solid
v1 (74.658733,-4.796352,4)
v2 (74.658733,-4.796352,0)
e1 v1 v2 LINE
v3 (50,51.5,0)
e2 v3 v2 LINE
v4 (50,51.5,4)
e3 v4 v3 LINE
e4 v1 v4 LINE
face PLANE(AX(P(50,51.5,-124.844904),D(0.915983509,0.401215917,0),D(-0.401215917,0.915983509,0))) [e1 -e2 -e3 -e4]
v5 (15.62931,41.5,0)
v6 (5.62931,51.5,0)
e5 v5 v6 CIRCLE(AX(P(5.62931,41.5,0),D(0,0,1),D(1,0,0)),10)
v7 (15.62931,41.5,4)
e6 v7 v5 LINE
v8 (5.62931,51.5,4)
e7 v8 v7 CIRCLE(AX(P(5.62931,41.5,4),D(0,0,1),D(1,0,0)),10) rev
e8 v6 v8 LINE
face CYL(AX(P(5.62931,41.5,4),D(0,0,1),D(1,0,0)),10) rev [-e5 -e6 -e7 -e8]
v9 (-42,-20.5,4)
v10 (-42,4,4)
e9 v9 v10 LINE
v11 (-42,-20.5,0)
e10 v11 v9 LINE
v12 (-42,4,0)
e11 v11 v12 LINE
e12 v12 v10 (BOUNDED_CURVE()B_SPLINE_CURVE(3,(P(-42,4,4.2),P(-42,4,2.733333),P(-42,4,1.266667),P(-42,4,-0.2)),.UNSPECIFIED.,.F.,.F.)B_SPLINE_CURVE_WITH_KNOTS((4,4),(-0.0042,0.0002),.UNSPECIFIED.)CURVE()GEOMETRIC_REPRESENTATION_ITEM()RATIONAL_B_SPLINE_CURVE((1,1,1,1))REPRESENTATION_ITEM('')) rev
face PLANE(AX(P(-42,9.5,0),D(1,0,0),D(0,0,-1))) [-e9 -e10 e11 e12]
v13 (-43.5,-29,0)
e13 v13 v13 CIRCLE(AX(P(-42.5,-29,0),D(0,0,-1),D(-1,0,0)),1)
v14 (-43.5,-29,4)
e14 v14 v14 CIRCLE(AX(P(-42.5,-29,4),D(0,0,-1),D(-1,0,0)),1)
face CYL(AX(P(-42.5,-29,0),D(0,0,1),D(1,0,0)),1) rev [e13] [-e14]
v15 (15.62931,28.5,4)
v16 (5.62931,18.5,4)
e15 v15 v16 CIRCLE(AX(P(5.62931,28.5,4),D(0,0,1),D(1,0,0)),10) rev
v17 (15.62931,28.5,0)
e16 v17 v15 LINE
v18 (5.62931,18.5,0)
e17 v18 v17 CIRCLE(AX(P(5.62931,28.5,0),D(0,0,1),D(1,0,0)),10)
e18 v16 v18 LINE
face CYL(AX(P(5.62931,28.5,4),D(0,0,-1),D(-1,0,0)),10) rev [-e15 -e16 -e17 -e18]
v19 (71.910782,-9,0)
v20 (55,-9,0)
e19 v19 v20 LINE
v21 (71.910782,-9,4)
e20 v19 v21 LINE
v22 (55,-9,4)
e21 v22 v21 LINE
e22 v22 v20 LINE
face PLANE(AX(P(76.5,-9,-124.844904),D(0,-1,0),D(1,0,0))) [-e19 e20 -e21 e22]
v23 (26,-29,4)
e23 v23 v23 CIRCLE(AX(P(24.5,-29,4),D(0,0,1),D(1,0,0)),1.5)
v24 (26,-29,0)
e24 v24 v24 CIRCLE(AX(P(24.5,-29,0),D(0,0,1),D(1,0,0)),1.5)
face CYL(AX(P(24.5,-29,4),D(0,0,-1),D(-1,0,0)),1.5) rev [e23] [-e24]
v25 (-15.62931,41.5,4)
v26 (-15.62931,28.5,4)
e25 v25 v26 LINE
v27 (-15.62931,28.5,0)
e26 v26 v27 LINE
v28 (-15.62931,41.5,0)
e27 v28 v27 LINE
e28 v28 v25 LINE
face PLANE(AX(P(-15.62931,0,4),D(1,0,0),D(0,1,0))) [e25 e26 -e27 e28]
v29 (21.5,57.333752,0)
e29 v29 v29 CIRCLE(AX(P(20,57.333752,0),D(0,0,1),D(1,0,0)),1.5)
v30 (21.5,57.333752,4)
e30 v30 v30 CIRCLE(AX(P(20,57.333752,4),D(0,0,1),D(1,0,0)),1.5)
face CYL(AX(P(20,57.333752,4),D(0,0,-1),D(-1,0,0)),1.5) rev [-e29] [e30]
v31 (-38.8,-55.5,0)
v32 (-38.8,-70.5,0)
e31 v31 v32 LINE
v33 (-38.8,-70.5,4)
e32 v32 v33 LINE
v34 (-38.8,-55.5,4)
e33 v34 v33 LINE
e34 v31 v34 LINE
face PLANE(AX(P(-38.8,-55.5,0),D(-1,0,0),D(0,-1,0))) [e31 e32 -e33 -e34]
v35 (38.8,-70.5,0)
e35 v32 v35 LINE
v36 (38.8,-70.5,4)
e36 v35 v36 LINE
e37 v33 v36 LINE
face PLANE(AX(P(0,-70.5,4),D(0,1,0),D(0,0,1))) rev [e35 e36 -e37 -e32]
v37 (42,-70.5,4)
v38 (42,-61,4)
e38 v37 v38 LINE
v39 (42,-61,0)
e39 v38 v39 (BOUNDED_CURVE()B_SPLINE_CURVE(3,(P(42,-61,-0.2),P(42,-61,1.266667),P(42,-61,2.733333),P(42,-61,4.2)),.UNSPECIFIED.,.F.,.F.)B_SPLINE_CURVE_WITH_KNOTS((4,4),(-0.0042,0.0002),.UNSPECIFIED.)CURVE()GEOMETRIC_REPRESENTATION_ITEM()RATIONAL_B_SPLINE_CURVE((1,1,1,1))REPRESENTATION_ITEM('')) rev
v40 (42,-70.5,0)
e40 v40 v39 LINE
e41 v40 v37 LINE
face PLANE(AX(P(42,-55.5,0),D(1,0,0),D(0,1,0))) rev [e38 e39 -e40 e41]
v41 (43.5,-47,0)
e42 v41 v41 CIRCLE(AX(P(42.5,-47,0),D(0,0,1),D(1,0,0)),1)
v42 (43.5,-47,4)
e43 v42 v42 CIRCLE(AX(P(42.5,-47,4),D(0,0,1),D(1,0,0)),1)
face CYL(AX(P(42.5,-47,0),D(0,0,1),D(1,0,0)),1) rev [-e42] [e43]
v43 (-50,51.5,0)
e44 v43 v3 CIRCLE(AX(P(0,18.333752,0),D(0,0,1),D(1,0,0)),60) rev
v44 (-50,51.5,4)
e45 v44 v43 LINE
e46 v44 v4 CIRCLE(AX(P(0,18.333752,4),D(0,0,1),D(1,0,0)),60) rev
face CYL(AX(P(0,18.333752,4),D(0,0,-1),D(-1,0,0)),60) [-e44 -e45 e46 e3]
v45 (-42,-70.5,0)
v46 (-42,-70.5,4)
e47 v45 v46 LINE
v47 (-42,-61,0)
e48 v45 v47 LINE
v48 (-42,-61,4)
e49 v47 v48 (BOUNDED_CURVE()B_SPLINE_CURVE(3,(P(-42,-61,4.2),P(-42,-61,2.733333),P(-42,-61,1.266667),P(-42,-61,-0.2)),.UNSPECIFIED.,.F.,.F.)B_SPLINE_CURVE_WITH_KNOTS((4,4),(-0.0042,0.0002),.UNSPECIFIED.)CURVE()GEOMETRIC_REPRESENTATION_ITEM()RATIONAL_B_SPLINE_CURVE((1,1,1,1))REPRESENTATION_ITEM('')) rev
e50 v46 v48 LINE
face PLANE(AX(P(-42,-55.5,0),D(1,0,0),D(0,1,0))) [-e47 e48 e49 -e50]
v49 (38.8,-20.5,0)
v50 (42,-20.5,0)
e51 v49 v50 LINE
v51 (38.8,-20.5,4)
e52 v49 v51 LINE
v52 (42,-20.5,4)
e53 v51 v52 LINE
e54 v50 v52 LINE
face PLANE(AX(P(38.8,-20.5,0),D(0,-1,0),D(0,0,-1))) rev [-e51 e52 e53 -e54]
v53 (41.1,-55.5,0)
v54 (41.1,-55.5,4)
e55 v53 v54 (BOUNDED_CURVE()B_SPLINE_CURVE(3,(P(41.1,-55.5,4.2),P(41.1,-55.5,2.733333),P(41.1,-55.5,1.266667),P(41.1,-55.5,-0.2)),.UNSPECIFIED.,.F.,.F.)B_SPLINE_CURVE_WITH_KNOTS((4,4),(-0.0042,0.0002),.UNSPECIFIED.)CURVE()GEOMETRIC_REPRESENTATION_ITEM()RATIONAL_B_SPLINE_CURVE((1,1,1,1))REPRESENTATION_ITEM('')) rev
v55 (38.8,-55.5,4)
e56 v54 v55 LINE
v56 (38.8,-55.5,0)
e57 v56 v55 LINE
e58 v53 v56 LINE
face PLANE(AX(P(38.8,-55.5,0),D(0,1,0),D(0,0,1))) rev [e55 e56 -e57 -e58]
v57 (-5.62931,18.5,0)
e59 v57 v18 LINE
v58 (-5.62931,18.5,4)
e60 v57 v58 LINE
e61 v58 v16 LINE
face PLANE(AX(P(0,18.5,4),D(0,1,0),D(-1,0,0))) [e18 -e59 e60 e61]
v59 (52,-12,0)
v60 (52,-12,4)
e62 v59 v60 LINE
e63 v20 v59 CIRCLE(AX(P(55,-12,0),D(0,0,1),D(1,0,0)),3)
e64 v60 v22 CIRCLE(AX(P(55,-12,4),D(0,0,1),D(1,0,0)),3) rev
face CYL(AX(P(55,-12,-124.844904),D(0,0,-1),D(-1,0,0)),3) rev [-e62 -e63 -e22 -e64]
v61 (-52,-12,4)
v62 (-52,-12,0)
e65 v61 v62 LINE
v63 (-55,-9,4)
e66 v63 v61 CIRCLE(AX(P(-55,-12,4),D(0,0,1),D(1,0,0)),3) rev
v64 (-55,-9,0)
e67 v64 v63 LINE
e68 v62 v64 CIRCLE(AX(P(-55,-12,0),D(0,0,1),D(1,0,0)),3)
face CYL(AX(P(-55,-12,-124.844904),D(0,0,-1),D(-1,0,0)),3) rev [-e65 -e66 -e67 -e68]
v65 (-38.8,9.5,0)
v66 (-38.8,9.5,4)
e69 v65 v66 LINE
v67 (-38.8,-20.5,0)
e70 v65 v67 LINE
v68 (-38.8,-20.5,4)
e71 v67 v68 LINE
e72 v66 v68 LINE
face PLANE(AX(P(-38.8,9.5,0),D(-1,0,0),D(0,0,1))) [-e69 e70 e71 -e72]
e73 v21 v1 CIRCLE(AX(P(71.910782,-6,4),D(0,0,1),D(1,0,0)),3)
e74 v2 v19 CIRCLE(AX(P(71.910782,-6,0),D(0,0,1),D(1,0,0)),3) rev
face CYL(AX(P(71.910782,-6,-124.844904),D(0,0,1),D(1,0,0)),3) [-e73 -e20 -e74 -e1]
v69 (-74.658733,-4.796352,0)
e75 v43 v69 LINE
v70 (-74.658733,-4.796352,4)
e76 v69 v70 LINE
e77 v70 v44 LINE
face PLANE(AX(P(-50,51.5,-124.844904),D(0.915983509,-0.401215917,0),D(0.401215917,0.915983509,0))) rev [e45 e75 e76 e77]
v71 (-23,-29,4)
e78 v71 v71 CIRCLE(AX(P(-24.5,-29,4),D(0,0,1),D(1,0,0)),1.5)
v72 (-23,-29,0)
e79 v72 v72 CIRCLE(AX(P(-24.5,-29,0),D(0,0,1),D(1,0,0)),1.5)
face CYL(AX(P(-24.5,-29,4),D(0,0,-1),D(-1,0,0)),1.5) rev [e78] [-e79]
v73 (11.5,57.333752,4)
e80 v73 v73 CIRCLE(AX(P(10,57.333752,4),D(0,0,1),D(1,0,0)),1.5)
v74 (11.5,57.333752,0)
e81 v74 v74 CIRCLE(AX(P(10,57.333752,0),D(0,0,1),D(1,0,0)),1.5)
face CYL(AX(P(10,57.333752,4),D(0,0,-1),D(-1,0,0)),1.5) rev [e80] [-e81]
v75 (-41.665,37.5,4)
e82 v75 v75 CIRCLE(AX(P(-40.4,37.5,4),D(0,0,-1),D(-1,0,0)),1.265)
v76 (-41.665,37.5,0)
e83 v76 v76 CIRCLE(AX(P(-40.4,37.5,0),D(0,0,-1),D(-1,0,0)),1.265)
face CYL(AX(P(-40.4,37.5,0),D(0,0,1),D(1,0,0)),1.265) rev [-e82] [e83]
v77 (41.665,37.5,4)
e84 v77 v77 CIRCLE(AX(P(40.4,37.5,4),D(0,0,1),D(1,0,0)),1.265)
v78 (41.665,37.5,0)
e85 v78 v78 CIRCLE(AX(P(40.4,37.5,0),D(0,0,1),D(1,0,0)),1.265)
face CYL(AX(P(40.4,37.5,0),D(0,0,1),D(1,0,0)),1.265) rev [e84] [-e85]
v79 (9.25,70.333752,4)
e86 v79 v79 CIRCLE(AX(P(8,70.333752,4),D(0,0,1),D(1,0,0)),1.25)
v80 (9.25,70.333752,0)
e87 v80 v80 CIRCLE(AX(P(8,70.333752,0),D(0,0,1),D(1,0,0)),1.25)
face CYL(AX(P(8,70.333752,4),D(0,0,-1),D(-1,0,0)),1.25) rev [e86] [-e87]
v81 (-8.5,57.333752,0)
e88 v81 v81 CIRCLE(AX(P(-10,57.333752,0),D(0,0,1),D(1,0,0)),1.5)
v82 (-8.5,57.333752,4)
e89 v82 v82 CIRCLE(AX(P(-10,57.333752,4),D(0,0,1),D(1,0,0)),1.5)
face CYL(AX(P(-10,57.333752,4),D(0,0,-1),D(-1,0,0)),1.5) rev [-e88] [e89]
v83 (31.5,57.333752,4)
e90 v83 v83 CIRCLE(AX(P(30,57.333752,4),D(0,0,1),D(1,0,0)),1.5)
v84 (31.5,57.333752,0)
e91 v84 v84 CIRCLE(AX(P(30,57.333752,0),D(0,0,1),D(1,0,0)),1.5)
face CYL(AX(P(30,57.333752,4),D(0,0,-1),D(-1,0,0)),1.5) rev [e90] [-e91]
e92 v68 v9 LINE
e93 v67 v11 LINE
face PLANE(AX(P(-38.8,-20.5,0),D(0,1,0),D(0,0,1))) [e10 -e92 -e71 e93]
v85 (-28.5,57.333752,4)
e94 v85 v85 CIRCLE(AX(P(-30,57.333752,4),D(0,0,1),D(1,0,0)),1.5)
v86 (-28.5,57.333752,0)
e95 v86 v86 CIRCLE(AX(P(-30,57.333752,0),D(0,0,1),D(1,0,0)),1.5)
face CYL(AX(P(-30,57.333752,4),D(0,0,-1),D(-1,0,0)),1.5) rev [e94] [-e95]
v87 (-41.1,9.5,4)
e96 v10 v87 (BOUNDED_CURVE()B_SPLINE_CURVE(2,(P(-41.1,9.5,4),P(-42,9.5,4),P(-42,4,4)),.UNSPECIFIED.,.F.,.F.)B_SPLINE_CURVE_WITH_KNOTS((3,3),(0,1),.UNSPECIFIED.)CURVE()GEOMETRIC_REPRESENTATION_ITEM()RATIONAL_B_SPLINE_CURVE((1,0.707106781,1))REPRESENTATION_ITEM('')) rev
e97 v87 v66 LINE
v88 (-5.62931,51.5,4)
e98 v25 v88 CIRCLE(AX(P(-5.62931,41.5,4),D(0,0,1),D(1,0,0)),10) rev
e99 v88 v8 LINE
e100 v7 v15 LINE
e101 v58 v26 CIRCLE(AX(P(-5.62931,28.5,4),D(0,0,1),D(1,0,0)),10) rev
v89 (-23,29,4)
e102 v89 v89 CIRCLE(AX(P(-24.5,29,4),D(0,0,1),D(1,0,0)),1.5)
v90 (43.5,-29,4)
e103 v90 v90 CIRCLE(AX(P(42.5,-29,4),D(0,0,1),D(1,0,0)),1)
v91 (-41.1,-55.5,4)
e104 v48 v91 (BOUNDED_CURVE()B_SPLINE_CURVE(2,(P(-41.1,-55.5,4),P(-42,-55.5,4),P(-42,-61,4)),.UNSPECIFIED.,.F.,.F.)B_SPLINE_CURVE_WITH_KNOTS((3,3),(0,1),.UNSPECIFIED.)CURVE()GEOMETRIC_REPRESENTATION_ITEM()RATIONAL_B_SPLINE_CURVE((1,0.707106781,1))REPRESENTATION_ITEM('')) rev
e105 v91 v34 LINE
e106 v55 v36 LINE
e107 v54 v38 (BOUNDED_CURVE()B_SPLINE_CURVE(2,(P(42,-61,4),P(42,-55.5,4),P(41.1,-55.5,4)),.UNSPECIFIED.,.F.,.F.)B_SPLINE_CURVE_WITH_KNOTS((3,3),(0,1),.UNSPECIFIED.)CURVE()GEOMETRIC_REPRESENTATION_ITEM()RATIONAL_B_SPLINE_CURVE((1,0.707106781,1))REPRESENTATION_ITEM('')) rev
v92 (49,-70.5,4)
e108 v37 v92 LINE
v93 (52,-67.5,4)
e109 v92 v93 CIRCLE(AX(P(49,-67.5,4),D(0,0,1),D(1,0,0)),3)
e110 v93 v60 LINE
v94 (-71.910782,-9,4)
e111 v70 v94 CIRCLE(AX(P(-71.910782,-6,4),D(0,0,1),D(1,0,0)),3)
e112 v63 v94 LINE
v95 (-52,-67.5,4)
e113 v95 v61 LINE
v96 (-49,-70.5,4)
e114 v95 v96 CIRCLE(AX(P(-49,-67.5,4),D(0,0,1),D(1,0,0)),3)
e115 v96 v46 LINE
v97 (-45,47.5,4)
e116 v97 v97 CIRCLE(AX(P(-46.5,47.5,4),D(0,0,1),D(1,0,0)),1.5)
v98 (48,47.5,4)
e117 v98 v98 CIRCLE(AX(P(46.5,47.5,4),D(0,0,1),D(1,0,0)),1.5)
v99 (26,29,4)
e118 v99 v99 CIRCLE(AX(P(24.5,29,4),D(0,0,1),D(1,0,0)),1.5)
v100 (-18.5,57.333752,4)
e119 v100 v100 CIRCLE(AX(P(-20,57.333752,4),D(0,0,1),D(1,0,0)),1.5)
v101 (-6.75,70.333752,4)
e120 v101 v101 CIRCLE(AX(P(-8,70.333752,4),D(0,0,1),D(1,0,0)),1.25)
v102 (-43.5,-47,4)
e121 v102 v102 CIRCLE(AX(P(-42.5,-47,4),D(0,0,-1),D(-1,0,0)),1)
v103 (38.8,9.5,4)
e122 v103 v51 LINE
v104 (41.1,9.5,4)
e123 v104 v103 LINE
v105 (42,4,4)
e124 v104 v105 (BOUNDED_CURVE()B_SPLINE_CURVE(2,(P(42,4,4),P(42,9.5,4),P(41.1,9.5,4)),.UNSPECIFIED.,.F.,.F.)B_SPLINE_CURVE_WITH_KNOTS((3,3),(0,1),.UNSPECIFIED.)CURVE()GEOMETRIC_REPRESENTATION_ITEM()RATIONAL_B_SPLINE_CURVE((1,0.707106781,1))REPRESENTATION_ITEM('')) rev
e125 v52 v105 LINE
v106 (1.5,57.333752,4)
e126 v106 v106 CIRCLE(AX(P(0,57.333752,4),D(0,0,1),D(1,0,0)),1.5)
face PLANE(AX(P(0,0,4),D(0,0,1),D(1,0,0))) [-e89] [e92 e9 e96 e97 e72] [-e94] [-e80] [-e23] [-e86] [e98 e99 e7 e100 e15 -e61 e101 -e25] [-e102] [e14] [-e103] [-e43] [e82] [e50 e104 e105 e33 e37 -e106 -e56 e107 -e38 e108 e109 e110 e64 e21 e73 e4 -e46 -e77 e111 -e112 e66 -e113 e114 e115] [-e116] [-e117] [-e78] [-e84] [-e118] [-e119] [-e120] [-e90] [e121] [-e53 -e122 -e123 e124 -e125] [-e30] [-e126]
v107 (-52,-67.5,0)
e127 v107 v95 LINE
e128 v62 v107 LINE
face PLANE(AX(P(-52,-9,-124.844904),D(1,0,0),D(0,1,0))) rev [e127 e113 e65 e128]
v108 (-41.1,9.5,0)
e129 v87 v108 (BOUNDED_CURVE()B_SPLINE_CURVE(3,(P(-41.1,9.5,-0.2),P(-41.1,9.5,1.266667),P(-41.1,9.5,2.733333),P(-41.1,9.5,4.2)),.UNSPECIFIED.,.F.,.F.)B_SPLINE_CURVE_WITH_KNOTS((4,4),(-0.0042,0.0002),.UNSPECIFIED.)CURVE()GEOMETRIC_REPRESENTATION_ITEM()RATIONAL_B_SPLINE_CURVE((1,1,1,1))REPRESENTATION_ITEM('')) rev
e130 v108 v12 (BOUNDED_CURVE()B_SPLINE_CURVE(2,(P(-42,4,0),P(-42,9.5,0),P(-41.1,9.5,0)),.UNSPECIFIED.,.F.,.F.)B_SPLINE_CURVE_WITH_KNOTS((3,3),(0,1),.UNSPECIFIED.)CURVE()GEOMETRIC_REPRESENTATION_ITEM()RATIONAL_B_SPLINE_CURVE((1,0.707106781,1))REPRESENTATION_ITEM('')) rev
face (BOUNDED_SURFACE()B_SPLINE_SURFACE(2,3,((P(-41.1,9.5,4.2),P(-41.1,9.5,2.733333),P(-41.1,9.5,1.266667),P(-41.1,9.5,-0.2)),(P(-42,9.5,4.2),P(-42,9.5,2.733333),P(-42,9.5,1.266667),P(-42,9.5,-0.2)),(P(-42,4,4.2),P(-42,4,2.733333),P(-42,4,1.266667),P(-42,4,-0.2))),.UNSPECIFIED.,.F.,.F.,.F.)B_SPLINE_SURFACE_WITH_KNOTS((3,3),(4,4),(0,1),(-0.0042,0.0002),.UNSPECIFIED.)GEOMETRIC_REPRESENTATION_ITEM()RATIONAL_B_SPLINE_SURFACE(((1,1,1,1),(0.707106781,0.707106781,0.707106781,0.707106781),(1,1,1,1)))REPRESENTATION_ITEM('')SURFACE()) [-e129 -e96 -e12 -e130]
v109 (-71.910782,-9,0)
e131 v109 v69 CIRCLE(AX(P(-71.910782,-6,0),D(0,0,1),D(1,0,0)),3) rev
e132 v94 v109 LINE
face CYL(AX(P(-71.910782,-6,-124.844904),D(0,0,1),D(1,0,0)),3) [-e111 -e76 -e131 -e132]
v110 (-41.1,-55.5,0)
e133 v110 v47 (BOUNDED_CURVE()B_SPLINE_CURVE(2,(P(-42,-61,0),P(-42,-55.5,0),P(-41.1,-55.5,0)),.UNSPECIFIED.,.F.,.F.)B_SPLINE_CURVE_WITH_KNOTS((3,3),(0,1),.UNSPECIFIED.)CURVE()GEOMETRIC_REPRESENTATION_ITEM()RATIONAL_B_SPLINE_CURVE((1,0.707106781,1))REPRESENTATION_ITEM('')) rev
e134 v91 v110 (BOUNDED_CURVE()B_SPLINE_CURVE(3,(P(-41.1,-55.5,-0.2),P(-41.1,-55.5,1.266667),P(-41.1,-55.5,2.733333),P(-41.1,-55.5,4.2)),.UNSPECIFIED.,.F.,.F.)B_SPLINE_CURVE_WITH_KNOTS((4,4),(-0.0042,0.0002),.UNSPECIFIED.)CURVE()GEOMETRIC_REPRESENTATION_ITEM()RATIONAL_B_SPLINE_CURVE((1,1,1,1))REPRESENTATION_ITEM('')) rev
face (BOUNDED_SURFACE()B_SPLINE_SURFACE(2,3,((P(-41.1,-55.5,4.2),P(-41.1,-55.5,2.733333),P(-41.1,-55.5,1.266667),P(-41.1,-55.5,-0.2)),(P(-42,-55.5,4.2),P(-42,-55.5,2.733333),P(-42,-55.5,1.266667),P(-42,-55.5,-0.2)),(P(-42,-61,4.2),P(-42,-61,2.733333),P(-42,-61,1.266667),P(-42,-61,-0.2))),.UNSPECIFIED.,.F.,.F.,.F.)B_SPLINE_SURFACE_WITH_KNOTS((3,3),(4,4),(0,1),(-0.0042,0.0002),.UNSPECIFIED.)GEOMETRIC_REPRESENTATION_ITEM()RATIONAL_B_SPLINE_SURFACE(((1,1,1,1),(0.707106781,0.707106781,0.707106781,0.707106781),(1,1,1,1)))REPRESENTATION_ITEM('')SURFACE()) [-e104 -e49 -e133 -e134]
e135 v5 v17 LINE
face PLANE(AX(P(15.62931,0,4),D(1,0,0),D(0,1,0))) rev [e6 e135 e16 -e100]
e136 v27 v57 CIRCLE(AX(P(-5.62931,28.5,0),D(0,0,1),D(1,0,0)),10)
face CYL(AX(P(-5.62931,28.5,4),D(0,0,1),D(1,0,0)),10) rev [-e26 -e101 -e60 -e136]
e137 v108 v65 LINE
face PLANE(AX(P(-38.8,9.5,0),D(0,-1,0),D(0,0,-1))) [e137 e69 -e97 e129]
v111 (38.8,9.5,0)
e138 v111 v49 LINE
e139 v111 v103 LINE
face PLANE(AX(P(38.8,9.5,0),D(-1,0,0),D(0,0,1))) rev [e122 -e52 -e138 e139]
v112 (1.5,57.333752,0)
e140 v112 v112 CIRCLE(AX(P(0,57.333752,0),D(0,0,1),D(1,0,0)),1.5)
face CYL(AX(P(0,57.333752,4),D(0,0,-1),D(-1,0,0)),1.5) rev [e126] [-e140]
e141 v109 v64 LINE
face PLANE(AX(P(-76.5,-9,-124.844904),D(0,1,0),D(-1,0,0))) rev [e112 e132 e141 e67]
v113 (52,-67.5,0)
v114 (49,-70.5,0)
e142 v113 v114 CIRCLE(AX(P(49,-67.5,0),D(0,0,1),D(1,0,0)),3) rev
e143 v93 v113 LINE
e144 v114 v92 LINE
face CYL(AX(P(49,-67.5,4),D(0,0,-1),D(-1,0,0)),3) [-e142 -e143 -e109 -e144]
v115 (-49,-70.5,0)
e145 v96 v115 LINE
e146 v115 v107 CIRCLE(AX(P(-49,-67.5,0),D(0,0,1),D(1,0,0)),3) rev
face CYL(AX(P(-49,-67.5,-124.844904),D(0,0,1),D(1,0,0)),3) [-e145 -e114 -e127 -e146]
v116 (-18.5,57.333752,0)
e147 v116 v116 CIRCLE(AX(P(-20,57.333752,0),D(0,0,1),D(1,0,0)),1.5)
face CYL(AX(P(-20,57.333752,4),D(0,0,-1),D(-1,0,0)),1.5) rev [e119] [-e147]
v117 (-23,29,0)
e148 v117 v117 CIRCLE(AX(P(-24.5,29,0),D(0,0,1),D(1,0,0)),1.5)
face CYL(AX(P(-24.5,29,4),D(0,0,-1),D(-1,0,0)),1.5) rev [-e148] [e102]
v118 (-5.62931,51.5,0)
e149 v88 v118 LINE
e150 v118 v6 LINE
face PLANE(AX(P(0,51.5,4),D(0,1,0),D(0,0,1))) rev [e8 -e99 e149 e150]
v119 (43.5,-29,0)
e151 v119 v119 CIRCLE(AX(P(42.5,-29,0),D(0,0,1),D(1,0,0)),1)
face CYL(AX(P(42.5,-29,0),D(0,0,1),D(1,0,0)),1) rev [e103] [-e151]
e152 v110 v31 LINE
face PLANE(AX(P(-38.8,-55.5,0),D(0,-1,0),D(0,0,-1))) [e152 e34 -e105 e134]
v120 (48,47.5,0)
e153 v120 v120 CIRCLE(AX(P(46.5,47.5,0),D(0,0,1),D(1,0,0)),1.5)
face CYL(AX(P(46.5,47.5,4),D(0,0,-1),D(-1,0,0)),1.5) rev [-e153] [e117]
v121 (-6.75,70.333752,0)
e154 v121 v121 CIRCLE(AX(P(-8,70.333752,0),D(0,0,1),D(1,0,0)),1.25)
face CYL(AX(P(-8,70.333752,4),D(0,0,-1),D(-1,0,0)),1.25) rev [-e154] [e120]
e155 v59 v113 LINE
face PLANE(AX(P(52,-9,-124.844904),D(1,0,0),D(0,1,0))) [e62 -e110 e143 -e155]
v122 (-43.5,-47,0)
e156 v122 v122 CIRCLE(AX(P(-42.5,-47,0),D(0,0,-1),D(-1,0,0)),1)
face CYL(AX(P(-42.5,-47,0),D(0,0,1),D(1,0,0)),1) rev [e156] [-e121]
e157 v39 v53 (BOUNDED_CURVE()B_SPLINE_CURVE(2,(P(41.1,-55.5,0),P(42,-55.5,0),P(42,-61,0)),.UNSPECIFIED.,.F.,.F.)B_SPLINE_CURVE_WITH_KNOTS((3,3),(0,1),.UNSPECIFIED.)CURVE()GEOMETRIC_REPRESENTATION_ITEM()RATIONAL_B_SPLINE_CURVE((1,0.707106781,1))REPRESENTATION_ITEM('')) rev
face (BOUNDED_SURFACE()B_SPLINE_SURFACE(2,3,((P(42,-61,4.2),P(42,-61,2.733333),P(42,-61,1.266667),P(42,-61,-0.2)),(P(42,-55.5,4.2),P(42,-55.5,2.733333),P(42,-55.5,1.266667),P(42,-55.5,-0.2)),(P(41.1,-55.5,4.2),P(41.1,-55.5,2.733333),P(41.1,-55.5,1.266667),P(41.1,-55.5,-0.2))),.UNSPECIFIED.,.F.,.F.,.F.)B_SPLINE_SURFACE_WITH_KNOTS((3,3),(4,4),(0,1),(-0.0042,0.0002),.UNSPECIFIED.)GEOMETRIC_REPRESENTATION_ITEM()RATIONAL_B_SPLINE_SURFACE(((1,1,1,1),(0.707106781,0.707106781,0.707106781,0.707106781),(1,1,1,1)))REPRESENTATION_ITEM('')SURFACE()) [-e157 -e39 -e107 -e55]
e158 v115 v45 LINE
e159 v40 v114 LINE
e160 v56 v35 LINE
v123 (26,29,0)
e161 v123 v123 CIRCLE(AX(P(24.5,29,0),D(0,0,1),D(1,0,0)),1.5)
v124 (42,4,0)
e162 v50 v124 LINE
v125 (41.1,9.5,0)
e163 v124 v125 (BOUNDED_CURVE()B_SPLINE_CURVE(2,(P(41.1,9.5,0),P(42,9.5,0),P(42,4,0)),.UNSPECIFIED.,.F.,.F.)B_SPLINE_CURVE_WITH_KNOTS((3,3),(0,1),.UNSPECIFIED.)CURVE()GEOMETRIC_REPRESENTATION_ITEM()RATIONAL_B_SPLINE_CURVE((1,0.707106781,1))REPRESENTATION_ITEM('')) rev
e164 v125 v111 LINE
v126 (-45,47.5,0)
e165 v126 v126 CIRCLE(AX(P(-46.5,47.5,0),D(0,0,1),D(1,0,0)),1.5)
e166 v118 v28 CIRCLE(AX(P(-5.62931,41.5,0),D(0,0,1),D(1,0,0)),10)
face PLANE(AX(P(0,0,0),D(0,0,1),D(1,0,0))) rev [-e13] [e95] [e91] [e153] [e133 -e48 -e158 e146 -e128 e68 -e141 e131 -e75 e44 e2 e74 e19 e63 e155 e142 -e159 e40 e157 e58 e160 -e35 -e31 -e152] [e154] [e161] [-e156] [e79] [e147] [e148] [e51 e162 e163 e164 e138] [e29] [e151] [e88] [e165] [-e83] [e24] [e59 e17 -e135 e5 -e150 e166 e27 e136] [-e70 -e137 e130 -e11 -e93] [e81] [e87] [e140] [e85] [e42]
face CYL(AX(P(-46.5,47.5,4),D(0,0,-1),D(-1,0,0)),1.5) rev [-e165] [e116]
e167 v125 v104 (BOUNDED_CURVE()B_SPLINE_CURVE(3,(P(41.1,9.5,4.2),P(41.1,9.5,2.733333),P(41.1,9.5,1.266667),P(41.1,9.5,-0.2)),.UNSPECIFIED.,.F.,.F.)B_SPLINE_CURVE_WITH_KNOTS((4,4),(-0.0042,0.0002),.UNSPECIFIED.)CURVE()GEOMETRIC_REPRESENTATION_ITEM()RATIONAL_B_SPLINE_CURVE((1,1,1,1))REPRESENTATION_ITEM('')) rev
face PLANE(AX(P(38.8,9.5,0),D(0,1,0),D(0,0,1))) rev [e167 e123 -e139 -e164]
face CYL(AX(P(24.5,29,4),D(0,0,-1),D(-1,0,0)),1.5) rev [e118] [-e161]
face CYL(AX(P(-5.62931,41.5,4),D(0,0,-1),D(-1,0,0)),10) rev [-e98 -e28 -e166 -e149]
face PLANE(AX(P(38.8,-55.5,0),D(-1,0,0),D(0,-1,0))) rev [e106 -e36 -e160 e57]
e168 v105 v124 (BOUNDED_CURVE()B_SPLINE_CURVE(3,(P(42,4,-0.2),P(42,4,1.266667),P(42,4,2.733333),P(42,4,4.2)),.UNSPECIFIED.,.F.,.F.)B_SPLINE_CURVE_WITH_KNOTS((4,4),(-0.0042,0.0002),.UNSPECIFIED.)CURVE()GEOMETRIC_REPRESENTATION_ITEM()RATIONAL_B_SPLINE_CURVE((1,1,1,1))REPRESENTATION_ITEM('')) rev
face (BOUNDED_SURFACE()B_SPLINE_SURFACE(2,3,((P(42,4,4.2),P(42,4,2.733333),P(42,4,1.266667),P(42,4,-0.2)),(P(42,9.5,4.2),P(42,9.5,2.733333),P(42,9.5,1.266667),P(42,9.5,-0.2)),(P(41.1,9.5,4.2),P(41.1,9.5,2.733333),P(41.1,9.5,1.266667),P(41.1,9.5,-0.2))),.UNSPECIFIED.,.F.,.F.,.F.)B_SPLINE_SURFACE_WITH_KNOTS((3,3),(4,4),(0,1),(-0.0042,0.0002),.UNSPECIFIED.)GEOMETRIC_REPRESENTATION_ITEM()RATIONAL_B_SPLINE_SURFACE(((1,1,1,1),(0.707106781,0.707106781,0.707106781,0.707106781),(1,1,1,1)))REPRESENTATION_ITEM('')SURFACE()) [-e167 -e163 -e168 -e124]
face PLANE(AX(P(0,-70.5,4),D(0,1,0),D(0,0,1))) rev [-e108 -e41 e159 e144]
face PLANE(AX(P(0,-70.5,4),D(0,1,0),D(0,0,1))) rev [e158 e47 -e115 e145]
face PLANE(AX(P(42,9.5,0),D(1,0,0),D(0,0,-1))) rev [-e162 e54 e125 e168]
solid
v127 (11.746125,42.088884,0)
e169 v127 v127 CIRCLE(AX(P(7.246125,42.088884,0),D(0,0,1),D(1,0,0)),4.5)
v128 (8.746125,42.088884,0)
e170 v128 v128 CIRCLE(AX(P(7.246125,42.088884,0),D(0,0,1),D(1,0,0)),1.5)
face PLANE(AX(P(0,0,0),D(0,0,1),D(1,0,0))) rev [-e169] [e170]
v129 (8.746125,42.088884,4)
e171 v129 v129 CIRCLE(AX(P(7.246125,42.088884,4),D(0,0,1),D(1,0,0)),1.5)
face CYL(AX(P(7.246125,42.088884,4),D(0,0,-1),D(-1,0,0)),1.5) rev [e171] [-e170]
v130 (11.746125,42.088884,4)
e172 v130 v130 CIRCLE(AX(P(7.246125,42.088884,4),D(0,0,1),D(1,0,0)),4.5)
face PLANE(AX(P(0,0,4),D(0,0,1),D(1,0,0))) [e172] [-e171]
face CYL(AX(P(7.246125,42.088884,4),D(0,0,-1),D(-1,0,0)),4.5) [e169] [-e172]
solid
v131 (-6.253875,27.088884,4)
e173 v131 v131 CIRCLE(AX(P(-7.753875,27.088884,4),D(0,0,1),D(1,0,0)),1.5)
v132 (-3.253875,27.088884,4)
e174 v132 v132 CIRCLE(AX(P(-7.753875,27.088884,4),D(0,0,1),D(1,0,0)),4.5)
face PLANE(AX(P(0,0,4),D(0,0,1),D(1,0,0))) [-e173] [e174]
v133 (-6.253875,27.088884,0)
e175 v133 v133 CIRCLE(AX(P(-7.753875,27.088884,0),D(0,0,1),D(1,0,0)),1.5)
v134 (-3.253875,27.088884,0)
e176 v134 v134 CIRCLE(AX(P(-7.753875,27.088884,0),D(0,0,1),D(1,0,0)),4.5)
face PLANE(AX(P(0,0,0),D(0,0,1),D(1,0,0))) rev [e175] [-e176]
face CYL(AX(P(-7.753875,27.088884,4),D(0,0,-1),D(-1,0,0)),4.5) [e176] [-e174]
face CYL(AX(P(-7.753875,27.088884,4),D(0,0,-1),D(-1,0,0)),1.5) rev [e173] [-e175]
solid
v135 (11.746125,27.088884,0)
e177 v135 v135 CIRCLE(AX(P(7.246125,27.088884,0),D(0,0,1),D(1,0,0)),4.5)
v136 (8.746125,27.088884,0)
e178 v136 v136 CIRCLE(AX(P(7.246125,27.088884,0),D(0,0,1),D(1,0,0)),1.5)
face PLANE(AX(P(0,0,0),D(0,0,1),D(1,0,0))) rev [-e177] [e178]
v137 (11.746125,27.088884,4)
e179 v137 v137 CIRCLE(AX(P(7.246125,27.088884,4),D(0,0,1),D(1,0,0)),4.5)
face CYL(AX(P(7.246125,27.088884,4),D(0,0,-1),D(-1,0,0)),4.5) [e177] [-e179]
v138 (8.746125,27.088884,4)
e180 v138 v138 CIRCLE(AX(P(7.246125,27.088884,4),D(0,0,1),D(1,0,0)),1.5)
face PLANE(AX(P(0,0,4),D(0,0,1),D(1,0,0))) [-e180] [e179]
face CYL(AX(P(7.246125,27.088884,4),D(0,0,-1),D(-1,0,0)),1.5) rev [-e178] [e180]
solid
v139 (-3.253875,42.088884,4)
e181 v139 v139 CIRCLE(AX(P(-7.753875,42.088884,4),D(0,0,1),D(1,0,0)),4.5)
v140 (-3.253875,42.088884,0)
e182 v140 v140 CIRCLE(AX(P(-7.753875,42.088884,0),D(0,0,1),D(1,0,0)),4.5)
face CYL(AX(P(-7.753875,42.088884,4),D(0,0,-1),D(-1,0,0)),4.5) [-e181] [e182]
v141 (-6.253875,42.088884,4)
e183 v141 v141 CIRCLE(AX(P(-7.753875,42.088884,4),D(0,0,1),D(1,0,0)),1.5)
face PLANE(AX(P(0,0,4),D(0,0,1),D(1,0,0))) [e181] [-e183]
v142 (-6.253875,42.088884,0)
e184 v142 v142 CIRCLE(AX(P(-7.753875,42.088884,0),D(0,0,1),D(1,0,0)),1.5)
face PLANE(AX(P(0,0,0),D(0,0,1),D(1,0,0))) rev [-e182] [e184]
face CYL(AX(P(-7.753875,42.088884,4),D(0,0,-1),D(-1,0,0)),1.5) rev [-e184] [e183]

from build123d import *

# Parameters (mm, degrees)
SKETCH2_R             = 1.5
SKETCH2_R_2           = 1.25
SKETCH2_W             = 31.25862069
SKETCH2_H             = 33
BOSS_EXTRUDE1_DEPTH   = 4
SKETCH2_R_3           = 4.5
BOSS_EXTRUDE1_2_DEPTH = 4
BOSS_EXTRUDE1_3_DEPTH = 4
BOSS_EXTRUDE1_4_DEPTH = 4
BOSS_EXTRUDE1_5_DEPTH = 4
FILLET1_R             = 10
BOSS_EXTRUDE2_DEPTH   = 4
FILLET2_R             = 3
SKETCH4_R             = 1
CUT_EXTRUDE1_DEPTH    = 109.461062225
SKETCH5_R             = 1.265
SKETCH5_W             = 3.2
SKETCH5_H             = 30
SKETCH5_H_2           = 15
CUT_EXTRUDE2_DEPTH    = 109.461062225
FILLET2_OF_MIRROR1_R  = 3
FILLET3_SIZE          = 5.5
FILLET3_SIZE_2        = 0.9


with BuildPart() as part:
    # Sketch2 → Boss-Extrude1 (new body)
    with BuildSketch(Plane.XY):
        with BuildLine():
            ThreePointArc((-50, 51.5), (0, 78.333752096), (50, 51.5))
            Line((50, 51.5), (50, -70.5))
            Line((50, -70.5), (-50, -70.5))
            Line((-50, -70.5), (-50, 51.5))
        make_face()
        with Locations((-30, 57.333752096)):
            Circle(SKETCH2_R, mode=Mode.SUBTRACT)
        with Locations((-20, 57.333752096)):
            Circle(SKETCH2_R, mode=Mode.SUBTRACT)
        with Locations((-10, 57.333752096)):
            Circle(SKETCH2_R, mode=Mode.SUBTRACT)
        with Locations((30, 57.333752096)):
            Circle(SKETCH2_R, mode=Mode.SUBTRACT)
        with Locations((20, 57.333752096)):
            Circle(SKETCH2_R, mode=Mode.SUBTRACT)
        with Locations((10, 57.333752096)):
            Circle(SKETCH2_R, mode=Mode.SUBTRACT)
        with Locations((8, 70.333752096)):
            Circle(SKETCH2_R_2, mode=Mode.SUBTRACT)
        with Locations((-8, 70.333752096)):
            Circle(SKETCH2_R_2, mode=Mode.SUBTRACT)
        with Locations((46.5, 47.5)):
            Circle(SKETCH2_R, mode=Mode.SUBTRACT)
        with Locations((-46.5, 47.5)):
            Circle(SKETCH2_R, mode=Mode.SUBTRACT)
        with Locations((24.5, -29)):
            Circle(SKETCH2_R, mode=Mode.SUBTRACT)
        with Locations((-24.5, -29)):
            Circle(SKETCH2_R, mode=Mode.SUBTRACT)
        with Locations((24.5, 29)):
            Circle(SKETCH2_R, mode=Mode.SUBTRACT)
        with Locations((-24.5, 29)):
            Circle(SKETCH2_R, mode=Mode.SUBTRACT)
        with Locations((0, 57.333752096)):
            Circle(SKETCH2_R, mode=Mode.SUBTRACT)
        with Locations((0, 35)):
            Rectangle(SKETCH2_W, SKETCH2_H, mode=Mode.SUBTRACT)
    extrude(amount=BOSS_EXTRUDE1_DEPTH)

    # Fillet1
    fillet1_edges = [part.edges().sort_by_distance(p)[0] for p in [
        (-15.629310345, 51.5, 2),
        (-15.629310345, 18.5, 2),
        (15.629310345, 18.5, 2),
        (15.629310345, 51.5, 2),
    ]]
    fillet(fillet1_edges, radius=FILLET1_R)

    # Sketch3 → Boss-Extrude2 (add)
    with BuildSketch(Plane.XY.offset(4)):
        Polygon((50, 51.5), (76.5, -9), (52, -9), (52, -70.5), (50, -70.5), align=None)
    boss_extrude2 = extrude(amount=-BOSS_EXTRUDE2_DEPTH)

    # Fillet2
    fillet2_edges = [part.edges().sort_by_distance(p)[0] for p in [
        (76.5, -9, 2),
        (52, -9, 2),
        (52, -70.5, 2),
    ]]
    fillet(fillet2_edges, radius=FILLET2_R)

    # Sketch4 → Cut-Extrude1 (cut, through all)
    with BuildSketch(Plane.XY.offset(4)):
        with Locations((42.5, -29)):
            Circle(SKETCH4_R)
        with Locations((42.5, -47)):
            Circle(SKETCH4_R)
    cut_extrude1 = extrude(amount=-CUT_EXTRUDE1_DEPTH, mode=Mode.SUBTRACT)

    # Sketch5 → Cut-Extrude2 (cut, through all)
    with BuildSketch(Plane.XY.offset(4)):
        with Locations((40.4, 37.5)):
            Circle(SKETCH5_R)
        with Locations((40.4, -5.5)):
            Rectangle(SKETCH5_W, SKETCH5_H)
        with Locations((40.4, -63)):
            Rectangle(SKETCH5_W, SKETCH5_H_2)
    cut_extrude2 = extrude(amount=-CUT_EXTRUDE2_DEPTH, mode=Mode.SUBTRACT)

    # Mirror1: Boss-Extrude2, Cut-Extrude1, Cut-Extrude2 across plane
    add(boss_extrude2.mirror(Plane(origin=(0, 0, 0), x_dir=(0, 0, 1), z_dir=(1, 0, 0))))
    add(cut_extrude1.mirror(Plane(origin=(0, 0, 0), x_dir=(0, 0, 1), z_dir=(1, 0, 0))), mode=Mode.SUBTRACT)
    add(cut_extrude2.mirror(Plane(origin=(0, 0, 0), x_dir=(0, 0, 1), z_dir=(1, 0, 0))), mode=Mode.SUBTRACT)

    # Fillet2 of Mirror1
    fillet2_of_mirror1_edges = [part.edges().sort_by_distance(p)[0] for p in [
        (-76.5, -9, 2),
        (-52, -9, 2),
        (-52, -70.5, 2),
    ]]
    fillet(fillet2_of_mirror1_edges, radius=FILLET2_OF_MIRROR1_R)

    # Fillet3
    # an asymmetric fillet: 5.5, 0.9 mm, written as the material it adds along each edge
    with BuildSketch(Plane(origin=(-42, -55.5, 4), x_dir=(0, -1, 0), z_dir=(0, 0, -1)), Plane(origin=(-42, 9.5, 4), x_dir=(0, -1, 0), z_dir=(0, 0, -1))) as fillet3_piece_1:
        with BuildLine():
            Bezier((FILLET3_SIZE, 0), (0, 0), (0, -FILLET3_SIZE_2), weights=[1, 0.707106781, 1])
            Line((0, -FILLET3_SIZE_2), (0, 0))
            Line((0, 0), (FILLET3_SIZE, 0))
        make_face()
    extrude(amount=4)
    with BuildSketch(Plane(origin=(42, -55.5, 4), x_dir=(-1, 0, 0), z_dir=(0, 0, -1)), Plane(origin=(42, 9.5, 4), x_dir=(-1, 0, 0), z_dir=(0, 0, -1))) as fillet3_piece_2:
        with BuildLine():
            Bezier((FILLET3_SIZE_2, 0), (0, 0), (0, -FILLET3_SIZE), weights=[1, 0.707106781, 1])
            Line((0, -FILLET3_SIZE), (0, 0))
            Line((0, 0), (FILLET3_SIZE_2, 0))
        make_face()
    extrude(amount=4)


with BuildPart() as body_2:
    # Sketch2 → Boss-Extrude1 2 (new body)
    with BuildSketch(Plane.XY):
        with Locations((-7.75387504, 42.088883684)):
            Circle(SKETCH2_R_3)
        with Locations((-7.75387504, 42.088883684)):
            Circle(SKETCH2_R, mode=Mode.SUBTRACT)
    extrude(amount=BOSS_EXTRUDE1_2_DEPTH)


with BuildPart() as body_3:
    # Sketch2 → Boss-Extrude1 3 (new body)
    with BuildSketch(Plane.XY):
        with Locations((-7.75387504, 27.088883684)):
            Circle(SKETCH2_R_3)
        with Locations((-7.75387504, 27.088883684)):
            Circle(SKETCH2_R, mode=Mode.SUBTRACT)
    extrude(amount=BOSS_EXTRUDE1_3_DEPTH)


with BuildPart() as body_4:
    # Sketch2 → Boss-Extrude1 4 (new body)
    with BuildSketch(Plane.XY):
        with Locations((7.24612496, 27.088883684)):
            Circle(SKETCH2_R_3)
        with Locations((7.24612496, 27.088883684)):
            Circle(SKETCH2_R, mode=Mode.SUBTRACT)
    extrude(amount=BOSS_EXTRUDE1_4_DEPTH)


with BuildPart() as body_5:
    # Sketch2 → Boss-Extrude1 5 (new body)
    with BuildSketch(Plane.XY):
        with Locations((7.24612496, 42.088883684)):
            Circle(SKETCH2_R_3)
        with Locations((7.24612496, 42.088883684)):
            Circle(SKETCH2_R, mode=Mode.SUBTRACT)
    extrude(amount=BOSS_EXTRUDE1_5_DEPTH)


solid = Compound([part.part, body_2.part, body_3.part, body_4.part, body_5.part])
